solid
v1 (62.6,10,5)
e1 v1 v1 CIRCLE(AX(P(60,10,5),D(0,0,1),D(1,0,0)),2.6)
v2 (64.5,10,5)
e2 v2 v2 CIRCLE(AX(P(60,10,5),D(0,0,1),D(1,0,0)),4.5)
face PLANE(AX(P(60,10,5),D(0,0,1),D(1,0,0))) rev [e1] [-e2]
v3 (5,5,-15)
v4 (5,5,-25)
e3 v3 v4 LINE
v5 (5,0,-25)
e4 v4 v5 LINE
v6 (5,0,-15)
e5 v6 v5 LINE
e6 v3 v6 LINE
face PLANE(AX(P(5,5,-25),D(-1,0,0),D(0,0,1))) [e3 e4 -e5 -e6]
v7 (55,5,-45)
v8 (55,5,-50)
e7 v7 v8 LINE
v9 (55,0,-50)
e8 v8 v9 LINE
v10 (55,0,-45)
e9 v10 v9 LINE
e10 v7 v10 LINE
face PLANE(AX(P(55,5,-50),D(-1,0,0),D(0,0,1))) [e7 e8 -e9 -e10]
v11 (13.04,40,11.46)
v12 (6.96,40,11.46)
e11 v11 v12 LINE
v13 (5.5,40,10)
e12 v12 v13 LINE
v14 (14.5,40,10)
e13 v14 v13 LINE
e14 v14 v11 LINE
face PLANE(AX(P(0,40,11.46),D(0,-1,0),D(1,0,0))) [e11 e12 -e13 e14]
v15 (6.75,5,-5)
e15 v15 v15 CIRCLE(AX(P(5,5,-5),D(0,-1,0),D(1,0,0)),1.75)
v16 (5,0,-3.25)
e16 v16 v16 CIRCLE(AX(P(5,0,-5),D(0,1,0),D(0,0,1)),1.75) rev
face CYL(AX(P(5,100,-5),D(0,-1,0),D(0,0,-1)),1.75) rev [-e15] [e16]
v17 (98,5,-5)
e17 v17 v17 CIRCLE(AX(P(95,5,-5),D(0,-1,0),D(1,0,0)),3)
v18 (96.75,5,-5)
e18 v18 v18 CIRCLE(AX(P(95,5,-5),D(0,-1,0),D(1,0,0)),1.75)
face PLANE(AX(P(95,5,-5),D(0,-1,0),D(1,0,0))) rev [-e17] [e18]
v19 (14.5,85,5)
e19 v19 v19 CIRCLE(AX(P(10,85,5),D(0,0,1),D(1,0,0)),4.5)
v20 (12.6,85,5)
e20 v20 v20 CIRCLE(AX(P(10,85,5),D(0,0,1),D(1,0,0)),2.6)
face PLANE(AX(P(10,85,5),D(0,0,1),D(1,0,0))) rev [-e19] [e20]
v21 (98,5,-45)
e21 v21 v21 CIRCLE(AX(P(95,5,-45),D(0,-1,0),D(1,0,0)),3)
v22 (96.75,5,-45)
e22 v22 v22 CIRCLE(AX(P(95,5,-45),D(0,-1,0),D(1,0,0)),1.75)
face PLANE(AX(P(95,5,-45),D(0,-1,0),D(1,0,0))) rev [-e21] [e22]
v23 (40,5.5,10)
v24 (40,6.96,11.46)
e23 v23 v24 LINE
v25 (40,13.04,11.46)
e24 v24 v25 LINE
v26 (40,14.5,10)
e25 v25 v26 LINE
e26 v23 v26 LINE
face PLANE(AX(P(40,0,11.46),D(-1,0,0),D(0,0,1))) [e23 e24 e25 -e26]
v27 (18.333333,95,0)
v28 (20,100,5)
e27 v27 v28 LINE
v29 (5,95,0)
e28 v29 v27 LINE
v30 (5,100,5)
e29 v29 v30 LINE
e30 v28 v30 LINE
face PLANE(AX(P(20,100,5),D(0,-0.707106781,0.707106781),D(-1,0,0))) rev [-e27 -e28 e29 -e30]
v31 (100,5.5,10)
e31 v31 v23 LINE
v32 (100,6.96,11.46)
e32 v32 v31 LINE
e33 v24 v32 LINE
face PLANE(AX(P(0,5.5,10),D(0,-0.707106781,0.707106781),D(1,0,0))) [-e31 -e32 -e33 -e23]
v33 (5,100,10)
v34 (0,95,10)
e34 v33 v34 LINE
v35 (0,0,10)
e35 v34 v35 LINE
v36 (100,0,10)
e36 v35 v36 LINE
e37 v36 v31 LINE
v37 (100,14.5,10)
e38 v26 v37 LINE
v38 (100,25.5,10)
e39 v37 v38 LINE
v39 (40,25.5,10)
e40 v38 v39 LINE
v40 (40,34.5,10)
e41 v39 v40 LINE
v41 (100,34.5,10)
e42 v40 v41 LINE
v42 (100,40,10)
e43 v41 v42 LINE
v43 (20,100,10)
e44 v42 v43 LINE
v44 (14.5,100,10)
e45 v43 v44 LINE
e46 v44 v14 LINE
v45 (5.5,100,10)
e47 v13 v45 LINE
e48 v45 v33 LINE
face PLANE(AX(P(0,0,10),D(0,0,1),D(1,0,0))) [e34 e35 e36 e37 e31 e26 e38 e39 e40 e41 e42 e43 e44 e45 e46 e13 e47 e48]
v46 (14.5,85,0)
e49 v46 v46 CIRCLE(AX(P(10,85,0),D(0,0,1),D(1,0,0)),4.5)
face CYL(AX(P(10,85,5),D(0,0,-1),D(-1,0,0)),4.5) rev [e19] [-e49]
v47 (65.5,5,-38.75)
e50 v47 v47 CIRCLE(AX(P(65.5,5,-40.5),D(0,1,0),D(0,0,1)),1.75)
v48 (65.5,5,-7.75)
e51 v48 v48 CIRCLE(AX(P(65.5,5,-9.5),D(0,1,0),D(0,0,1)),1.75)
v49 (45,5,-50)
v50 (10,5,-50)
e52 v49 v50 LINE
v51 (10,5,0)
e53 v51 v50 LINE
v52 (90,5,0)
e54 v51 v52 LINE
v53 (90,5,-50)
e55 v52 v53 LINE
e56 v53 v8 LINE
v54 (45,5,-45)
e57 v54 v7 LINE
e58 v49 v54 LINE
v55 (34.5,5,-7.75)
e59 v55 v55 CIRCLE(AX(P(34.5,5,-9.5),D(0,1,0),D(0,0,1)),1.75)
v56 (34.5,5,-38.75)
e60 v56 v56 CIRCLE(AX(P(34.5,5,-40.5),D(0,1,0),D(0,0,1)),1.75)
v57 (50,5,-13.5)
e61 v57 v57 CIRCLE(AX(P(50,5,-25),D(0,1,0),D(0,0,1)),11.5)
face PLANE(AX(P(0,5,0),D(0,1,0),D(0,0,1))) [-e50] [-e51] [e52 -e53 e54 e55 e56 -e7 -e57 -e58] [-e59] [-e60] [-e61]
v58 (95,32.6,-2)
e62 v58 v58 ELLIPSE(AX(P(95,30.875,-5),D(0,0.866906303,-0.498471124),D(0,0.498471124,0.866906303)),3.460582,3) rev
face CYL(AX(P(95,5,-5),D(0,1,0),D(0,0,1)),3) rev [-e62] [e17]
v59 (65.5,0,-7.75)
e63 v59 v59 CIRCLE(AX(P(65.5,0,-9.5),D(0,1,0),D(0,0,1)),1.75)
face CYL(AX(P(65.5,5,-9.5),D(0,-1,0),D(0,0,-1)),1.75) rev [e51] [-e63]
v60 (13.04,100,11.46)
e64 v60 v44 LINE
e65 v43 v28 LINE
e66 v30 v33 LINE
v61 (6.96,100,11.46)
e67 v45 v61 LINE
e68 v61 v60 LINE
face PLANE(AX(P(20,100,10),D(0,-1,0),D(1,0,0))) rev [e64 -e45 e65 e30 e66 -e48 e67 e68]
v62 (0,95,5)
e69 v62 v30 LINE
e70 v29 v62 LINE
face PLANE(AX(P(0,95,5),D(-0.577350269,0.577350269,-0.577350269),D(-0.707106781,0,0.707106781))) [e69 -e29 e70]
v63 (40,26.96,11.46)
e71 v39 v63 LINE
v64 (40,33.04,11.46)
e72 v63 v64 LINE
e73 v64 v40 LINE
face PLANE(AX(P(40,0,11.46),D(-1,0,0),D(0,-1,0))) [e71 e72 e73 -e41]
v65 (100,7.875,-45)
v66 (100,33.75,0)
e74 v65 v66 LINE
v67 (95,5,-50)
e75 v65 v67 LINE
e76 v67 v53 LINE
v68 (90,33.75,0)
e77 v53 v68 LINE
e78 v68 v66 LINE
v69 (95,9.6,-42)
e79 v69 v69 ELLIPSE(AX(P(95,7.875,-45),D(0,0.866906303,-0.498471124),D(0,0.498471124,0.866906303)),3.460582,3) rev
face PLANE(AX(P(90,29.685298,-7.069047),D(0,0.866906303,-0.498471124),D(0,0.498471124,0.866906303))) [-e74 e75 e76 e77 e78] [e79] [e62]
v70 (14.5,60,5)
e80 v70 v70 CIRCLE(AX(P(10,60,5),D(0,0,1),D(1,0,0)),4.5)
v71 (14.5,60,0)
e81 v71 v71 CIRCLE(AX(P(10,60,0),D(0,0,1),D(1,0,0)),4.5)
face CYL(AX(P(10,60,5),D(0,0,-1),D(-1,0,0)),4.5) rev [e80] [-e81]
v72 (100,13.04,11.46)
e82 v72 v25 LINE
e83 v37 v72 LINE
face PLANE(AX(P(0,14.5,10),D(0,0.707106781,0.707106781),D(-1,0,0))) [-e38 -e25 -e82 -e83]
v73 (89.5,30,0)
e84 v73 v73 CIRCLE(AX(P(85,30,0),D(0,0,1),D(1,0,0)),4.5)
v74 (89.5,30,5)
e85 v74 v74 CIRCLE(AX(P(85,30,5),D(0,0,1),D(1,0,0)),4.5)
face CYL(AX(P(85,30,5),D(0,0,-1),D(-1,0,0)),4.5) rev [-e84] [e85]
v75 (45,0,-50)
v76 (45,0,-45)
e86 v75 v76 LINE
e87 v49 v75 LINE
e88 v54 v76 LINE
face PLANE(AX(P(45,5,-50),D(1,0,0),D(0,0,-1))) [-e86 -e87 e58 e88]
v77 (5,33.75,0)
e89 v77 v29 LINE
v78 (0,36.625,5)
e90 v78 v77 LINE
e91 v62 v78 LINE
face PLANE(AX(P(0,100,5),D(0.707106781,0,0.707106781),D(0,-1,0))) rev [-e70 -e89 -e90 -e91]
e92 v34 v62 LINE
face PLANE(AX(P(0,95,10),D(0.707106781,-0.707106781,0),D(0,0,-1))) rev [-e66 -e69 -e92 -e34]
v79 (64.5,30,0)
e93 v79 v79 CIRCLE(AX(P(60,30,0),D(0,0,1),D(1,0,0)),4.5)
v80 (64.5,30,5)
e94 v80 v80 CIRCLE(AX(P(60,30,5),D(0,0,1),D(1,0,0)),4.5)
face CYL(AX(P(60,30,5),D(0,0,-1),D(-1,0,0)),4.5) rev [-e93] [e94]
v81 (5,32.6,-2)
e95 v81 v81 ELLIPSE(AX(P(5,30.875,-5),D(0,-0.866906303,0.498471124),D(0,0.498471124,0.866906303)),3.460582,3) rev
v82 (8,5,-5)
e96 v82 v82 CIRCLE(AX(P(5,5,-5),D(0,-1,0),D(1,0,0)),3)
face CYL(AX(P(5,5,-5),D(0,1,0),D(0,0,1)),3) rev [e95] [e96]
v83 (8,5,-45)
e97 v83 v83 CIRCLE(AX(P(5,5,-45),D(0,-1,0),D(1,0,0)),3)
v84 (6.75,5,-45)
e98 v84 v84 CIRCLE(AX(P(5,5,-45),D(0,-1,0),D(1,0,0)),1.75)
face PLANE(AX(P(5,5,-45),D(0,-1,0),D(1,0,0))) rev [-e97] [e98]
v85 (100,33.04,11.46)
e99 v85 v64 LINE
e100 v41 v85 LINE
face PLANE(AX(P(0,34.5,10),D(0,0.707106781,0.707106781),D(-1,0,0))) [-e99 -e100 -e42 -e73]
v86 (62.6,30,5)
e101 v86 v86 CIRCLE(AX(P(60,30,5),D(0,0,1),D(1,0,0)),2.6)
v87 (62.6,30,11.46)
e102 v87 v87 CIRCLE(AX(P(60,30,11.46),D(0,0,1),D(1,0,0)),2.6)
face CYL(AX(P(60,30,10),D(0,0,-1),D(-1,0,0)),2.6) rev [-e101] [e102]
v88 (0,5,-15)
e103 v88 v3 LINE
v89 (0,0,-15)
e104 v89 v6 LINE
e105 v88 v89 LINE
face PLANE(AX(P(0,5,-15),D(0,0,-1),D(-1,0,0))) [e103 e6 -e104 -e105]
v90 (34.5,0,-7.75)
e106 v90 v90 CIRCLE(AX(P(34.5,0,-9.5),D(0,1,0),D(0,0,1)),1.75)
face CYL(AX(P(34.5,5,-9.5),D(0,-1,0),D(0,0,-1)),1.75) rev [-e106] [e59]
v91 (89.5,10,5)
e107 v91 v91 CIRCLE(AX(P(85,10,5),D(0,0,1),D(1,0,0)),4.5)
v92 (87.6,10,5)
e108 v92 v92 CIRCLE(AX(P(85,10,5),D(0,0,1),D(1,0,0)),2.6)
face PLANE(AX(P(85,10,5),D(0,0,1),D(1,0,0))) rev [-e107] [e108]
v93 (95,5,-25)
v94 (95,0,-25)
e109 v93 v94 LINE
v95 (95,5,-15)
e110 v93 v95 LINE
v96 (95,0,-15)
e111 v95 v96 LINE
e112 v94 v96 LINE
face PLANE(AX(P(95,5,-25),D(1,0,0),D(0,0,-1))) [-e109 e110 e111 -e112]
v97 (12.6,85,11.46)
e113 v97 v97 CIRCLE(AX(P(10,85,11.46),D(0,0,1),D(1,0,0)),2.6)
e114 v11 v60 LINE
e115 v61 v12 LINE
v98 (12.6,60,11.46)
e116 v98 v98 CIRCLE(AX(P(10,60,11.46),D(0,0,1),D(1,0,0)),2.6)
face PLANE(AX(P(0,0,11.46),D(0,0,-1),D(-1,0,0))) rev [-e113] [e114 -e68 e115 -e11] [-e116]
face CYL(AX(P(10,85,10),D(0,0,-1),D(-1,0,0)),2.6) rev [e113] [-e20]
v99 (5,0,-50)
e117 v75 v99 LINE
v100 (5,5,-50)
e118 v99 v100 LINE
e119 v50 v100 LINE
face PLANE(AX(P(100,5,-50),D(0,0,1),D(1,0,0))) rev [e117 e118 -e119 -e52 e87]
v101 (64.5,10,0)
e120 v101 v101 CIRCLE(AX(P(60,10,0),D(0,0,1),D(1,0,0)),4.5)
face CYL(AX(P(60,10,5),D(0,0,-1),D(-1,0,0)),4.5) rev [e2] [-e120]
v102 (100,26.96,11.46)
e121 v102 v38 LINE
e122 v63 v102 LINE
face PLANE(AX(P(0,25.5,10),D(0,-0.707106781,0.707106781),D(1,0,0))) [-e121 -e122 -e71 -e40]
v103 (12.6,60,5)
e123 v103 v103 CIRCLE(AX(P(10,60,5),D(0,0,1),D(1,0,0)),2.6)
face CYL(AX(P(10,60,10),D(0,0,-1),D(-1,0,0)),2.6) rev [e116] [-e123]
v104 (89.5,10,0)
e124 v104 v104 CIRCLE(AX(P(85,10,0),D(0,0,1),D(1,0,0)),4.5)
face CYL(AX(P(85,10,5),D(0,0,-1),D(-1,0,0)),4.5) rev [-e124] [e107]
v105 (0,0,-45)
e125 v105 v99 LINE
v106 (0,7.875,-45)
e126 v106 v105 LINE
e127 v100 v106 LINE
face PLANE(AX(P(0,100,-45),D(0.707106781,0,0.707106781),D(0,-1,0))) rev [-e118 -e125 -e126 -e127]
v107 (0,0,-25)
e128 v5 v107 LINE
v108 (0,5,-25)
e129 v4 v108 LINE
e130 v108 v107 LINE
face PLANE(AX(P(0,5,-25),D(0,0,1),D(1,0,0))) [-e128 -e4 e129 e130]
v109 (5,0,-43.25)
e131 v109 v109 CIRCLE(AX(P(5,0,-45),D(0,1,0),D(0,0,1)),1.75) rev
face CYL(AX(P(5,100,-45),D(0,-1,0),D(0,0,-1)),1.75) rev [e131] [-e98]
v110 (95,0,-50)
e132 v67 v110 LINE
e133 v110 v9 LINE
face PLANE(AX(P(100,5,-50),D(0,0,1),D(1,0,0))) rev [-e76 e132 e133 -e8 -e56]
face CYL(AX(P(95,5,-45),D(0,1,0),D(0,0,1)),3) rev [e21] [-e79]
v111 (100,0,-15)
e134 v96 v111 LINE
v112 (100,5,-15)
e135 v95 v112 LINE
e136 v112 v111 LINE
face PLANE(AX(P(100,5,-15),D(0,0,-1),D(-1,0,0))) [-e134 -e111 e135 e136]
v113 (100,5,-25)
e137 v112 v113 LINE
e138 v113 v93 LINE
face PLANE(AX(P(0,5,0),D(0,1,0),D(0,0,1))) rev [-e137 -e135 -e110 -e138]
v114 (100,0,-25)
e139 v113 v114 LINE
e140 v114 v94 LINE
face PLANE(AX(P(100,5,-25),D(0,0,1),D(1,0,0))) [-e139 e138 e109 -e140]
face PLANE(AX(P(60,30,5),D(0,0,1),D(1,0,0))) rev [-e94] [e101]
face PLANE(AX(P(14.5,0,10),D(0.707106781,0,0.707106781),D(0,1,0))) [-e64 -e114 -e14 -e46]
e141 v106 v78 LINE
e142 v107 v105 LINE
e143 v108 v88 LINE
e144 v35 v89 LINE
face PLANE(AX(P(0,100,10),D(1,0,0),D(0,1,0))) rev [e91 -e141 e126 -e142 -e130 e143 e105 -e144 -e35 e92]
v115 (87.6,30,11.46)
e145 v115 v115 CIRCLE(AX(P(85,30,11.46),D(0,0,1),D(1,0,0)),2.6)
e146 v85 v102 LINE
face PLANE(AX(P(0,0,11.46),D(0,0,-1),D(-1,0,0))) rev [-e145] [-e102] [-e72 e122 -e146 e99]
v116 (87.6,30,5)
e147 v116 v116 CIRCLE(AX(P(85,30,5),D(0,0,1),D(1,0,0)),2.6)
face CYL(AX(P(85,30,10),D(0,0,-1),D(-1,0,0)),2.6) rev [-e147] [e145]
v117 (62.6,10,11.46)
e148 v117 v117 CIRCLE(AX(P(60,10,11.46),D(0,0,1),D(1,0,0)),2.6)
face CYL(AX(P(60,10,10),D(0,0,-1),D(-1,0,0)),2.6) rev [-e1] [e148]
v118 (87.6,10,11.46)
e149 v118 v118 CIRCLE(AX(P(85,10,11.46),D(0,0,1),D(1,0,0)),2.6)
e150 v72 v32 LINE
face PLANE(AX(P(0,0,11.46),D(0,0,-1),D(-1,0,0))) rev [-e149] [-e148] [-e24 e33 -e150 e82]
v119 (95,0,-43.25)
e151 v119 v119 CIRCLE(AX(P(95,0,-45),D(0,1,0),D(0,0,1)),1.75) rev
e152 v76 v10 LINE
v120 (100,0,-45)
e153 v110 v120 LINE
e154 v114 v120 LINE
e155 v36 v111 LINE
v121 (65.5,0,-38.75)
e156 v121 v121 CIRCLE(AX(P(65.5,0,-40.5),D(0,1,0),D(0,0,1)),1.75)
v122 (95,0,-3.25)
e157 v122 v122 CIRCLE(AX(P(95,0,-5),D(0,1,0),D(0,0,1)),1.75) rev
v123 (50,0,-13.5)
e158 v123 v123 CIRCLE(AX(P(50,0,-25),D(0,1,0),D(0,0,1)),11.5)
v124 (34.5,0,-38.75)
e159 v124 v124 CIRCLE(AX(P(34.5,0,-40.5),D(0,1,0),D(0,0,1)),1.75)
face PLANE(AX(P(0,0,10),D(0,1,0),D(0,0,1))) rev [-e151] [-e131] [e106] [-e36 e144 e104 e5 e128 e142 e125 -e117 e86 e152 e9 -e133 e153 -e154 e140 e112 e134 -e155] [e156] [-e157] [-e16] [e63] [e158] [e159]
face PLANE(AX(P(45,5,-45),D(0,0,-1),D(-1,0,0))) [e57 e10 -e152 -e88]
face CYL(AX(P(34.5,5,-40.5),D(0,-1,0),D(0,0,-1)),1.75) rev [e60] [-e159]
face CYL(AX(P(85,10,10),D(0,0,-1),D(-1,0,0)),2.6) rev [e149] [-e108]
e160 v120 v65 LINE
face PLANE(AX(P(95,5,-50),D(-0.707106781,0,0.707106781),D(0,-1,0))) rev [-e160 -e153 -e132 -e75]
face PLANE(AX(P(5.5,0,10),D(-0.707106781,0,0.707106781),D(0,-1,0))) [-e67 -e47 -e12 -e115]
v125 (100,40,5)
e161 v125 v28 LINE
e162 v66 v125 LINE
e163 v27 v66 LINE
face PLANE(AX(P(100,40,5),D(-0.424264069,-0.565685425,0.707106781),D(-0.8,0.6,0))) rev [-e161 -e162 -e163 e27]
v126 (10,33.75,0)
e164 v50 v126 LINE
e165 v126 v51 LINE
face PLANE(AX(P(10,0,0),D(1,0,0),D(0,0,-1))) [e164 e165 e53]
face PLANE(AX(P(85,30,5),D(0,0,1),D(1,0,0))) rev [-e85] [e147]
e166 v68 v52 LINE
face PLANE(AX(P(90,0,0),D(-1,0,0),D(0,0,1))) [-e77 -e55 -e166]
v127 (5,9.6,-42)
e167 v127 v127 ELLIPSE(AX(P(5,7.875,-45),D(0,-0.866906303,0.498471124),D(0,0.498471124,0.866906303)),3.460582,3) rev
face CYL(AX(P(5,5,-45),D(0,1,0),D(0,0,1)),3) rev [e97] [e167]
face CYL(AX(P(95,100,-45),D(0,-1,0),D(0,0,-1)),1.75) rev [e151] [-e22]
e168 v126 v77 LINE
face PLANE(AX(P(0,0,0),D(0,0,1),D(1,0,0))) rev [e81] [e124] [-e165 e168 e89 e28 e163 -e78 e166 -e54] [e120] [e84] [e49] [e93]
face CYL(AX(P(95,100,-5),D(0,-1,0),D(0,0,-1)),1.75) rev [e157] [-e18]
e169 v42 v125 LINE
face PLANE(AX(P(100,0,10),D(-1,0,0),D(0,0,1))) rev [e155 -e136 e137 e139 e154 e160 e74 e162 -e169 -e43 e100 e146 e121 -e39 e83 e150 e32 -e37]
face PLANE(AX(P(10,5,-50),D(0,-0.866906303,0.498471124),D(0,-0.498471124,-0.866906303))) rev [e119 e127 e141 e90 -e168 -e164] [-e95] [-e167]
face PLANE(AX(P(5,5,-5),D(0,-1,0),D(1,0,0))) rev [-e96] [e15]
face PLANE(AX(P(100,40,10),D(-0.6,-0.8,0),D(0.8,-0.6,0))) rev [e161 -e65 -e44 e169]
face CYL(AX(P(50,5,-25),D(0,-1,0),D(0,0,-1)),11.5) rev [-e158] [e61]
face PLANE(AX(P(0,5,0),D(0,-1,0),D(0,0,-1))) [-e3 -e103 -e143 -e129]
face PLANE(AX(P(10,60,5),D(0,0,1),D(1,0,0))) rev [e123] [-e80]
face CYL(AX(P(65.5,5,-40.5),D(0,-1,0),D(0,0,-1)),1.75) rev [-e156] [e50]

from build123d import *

# Parameters (mm, degrees)
BOSS_EXTRUDE1_DEPTH     = 10
SKETCH2_R               = 2.6
CUT_EXTRUDE1_DEPTH      = 142.774468788
BOSS_EXTRUDE3_START     = 10
SKETCH3_W               = 60
SKETCH3_H               = 9
SKETCH3_W_2             = 9
SKETCH3_H_2             = 60
BOSS_EXTRUDE3_DEPTH     = 1.46
CUT_EXTRUDE2_DEPTH      = 142.884923794
CUT_EXTRUDE2_DEPTH_BACK = 142.884923794
SKETCH2_2_R             = 2.6
CHAMFER1_SIZE           = 1.46
SKETCH4_R               = 4.5
CUT_EXTRUDE3_DEPTH      = 5
SKETCH5_W               = 100
SKETCH5_H               = 50
SKETCH5_R               = 11.5
SKETCH5_R_2             = 1.75
BOSS_EXTRUDE4_DEPTH     = 5
BOSS_EXTRUDE5_DEPTH     = 10
BOSS_EXTRUDE6_START     = 100
BOSS_EXTRUDE6_DEPTH     = 10
CUT_EXTRUDE4_DEPTH      = 151
CUT_EXTRUDE4_DEPTH_BACK = 151
SKETCH9_R               = 1.75
CUT_EXTRUDE5_START      = 100
SKETCH11_R              = 3
CUT_EXTRUDE5_DEPTH      = 95
SKETCH12_W              = 5
SKETCH12_H              = 10
SKETCH12_W_2            = 10
SKETCH12_H_2            = 5
CUT_EXTRUDE6_DEPTH      = 5
CHAMFER2_SIZE           = 5


with BuildPart() as part:
    # Sketch1 → Boss-Extrude1 (new body)
    with BuildSketch(Plane.XY):
        Polygon((0, 0), (100, 0), (100, 40), (20, 100), (0, 100), align=None)
    extrude(amount=BOSS_EXTRUDE1_DEPTH)

    # Sketch2 → Cut-Extrude1 (cut, through all)
    with BuildSketch(Plane.XY):
        with Locations((10, 85)):
            Circle(SKETCH2_R)
        with Locations((10, 60)):
            Circle(SKETCH2_R)
        with Locations((85, 30)):
            Circle(SKETCH2_R)
        with Locations((85, 10)):
            Circle(SKETCH2_R)
        with Locations((60, 10)):
            Circle(SKETCH2_R)
        with Locations((60, 30)):
            Circle(SKETCH2_R)
    extrude(amount=CUT_EXTRUDE1_DEPTH, mode=Mode.SUBTRACT)

    # Sketch3 → Boss-Extrude3 (add)
    with BuildSketch(Plane.XY.offset(BOSS_EXTRUDE3_START)):
        with Locations((70, 30)):
            Rectangle(SKETCH3_W, SKETCH3_H)
        with Locations((70, 10)):
            Rectangle(SKETCH3_W, SKETCH3_H)
        with Locations((10, 70)):
            Rectangle(SKETCH3_W_2, SKETCH3_H_2)
    extrude(amount=BOSS_EXTRUDE3_DEPTH)

    # Sketch2<2> → Cut-Extrude2 (cut, two sides: drawn at the far end of the back side and taken through both)
    with BuildSketch(Plane.XY.offset(-CUT_EXTRUDE2_DEPTH_BACK)):
        with Locations((10, 85)):
            Circle(SKETCH2_2_R)
        with Locations((10, 60)):
            Circle(SKETCH2_2_R)
        with Locations((85, 30)):
            Circle(SKETCH2_2_R)
        with Locations((85, 10)):
            Circle(SKETCH2_2_R)
        with Locations((60, 10)):
            Circle(SKETCH2_2_R)
        with Locations((60, 30)):
            Circle(SKETCH2_2_R)
    extrude(amount=CUT_EXTRUDE2_DEPTH + CUT_EXTRUDE2_DEPTH_BACK, mode=Mode.SUBTRACT)

    # Chamfer1
    chamfer1_edges = [part.edges().sort_by_distance(p)[0] for p in [
        (14.5, 70, 11.46),
        (5.5, 70, 11.46),
        (70, 5.5, 11.46),
        (70, 14.5, 11.46),
        (70, 25.5, 11.46),
        (70, 34.5, 11.46),
    ]]
    chamfer(chamfer1_edges, length=CHAMFER1_SIZE - 0.0001)  # a hair under: the kernel refuses the full size

    # Sketch4 → Cut-Extrude3 (cut)
    with BuildSketch(Plane.XY):
        with Locations((10, 85)):
            Circle(SKETCH4_R)
        with Locations((10, 60)):
            Circle(SKETCH4_R)
        with Locations((60, 30)):
            Circle(SKETCH4_R)
        with Locations((85, 30)):
            Circle(SKETCH4_R)
        with Locations((85, 10)):
            Circle(SKETCH4_R)
        with Locations((60, 10)):
            Circle(SKETCH4_R)
    extrude(amount=CUT_EXTRUDE3_DEPTH, mode=Mode.SUBTRACT)

    # Sketch5 → Boss-Extrude4 (add)
    with BuildSketch(Plane(origin=(0, 0, 0), x_dir=(1, 0, 0), z_dir=(0, 1, 0))):
        with Locations((50, 25)):
            Rectangle(SKETCH5_W, SKETCH5_H)
        with Locations(Location((50, 25, 0), (0, 0, 270))):
            Circle(SKETCH5_R, mode=Mode.SUBTRACT)
        with Locations(Location((65.5, 9.5, 0), (0, 0, 270))):
            Circle(SKETCH5_R_2, mode=Mode.SUBTRACT)
        with Locations(Location((34.5, 9.5, 0), (0, 0, 270))):
            Circle(SKETCH5_R_2, mode=Mode.SUBTRACT)
        with Locations(Location((34.5, 40.5, 0), (0, 0, 270))):
            Circle(SKETCH5_R_2, mode=Mode.SUBTRACT)
        with Locations(Location((65.5, 40.5, 0), (0, 0, 270))):
            Circle(SKETCH5_R_2, mode=Mode.SUBTRACT)
    extrude(amount=BOSS_EXTRUDE4_DEPTH)

    # Sketch8 → Boss-Extrude5 (add)
    with BuildSketch(Plane(origin=(0, 0, 0), x_dir=(0, 0, -1), z_dir=(1, 0, 0))):
        Polygon((0, 5), (50, 5), (0, 33.75), align=None)
    extrude(amount=BOSS_EXTRUDE5_DEPTH)

    # Sketch8<2> → Boss-Extrude6 (add)
    with BuildSketch(Plane(origin=(0, 0, 0), x_dir=(0, 0, -1), z_dir=(1, 0, 0)).offset(BOSS_EXTRUDE6_START)):
        Polygon((0, 5), (50, 5), (0, 33.75), align=None)
    extrude(amount=-BOSS_EXTRUDE6_DEPTH)

    # Sketch9 → Cut-Extrude4 (cut, two sides: drawn at the far end of the back side and taken through both)
    with BuildSketch(Plane(origin=(0, 0, 0), x_dir=(1, 0, 0), z_dir=(0, 1, 0)).offset(-CUT_EXTRUDE4_DEPTH_BACK)):
        with Locations(Location((95, 45, 0), (0, 0, 90))):
            Circle(SKETCH9_R)
        with Locations(Location((5, 45, 0), (0, 0, 90))):
            Circle(SKETCH9_R)
        with Locations(Location((5, 5, 0), (0, 0, 90))):
            Circle(SKETCH9_R)
        with Locations(Location((95, 5, 0), (0, 0, 90))):
            Circle(SKETCH9_R)
    extrude(amount=CUT_EXTRUDE4_DEPTH + CUT_EXTRUDE4_DEPTH_BACK, mode=Mode.SUBTRACT)

    # Sketch11 → Cut-Extrude5 (cut)
    with BuildSketch(Plane(origin=(0, 0, 0), x_dir=(1, 0, 0), z_dir=(0, 1, 0)).offset(CUT_EXTRUDE5_START)):
        with Locations(Location((95, 5, 0), (0, 0, 270))):
            Circle(SKETCH11_R)
        with Locations(Location((95, 45, 0), (0, 0, 270))):
            Circle(SKETCH11_R)
        with Locations(Location((5, 5, 0), (0, 0, 270))):
            Circle(SKETCH11_R)
        with Locations(Location((5, 45, 0), (0, 0, 270))):
            Circle(SKETCH11_R)
    extrude(amount=-CUT_EXTRUDE5_DEPTH, mode=Mode.SUBTRACT)

    # Sketch12 → Cut-Extrude6 (cut)
    with BuildSketch(Plane(origin=(0, 0, 0), x_dir=(1, 0, 0), z_dir=(0, 1, 0))):
        with Locations((97.5, 20)):
            Rectangle(SKETCH12_W, SKETCH12_H)
        with Locations((2.5, 20)):
            Rectangle(SKETCH12_W, SKETCH12_H)
        with Locations((50, 47.5)):
            Rectangle(SKETCH12_W_2, SKETCH12_H_2)
    extrude(amount=CUT_EXTRUDE6_DEPTH, mode=Mode.SUBTRACT)

    # Chamfer2
    chamfer2_edges = [part.edges().sort_by_distance(p)[0] for p in [
        (100, 2.5, -50),
        (0, 2.5, -50),
        (60, 70, 0),
        (0, 100, 5),
        (10, 100, 0),
        (0, 66.875, 0),
    ]]
    chamfer(chamfer2_edges, length=CHAMFER2_SIZE)


solid = part.part
